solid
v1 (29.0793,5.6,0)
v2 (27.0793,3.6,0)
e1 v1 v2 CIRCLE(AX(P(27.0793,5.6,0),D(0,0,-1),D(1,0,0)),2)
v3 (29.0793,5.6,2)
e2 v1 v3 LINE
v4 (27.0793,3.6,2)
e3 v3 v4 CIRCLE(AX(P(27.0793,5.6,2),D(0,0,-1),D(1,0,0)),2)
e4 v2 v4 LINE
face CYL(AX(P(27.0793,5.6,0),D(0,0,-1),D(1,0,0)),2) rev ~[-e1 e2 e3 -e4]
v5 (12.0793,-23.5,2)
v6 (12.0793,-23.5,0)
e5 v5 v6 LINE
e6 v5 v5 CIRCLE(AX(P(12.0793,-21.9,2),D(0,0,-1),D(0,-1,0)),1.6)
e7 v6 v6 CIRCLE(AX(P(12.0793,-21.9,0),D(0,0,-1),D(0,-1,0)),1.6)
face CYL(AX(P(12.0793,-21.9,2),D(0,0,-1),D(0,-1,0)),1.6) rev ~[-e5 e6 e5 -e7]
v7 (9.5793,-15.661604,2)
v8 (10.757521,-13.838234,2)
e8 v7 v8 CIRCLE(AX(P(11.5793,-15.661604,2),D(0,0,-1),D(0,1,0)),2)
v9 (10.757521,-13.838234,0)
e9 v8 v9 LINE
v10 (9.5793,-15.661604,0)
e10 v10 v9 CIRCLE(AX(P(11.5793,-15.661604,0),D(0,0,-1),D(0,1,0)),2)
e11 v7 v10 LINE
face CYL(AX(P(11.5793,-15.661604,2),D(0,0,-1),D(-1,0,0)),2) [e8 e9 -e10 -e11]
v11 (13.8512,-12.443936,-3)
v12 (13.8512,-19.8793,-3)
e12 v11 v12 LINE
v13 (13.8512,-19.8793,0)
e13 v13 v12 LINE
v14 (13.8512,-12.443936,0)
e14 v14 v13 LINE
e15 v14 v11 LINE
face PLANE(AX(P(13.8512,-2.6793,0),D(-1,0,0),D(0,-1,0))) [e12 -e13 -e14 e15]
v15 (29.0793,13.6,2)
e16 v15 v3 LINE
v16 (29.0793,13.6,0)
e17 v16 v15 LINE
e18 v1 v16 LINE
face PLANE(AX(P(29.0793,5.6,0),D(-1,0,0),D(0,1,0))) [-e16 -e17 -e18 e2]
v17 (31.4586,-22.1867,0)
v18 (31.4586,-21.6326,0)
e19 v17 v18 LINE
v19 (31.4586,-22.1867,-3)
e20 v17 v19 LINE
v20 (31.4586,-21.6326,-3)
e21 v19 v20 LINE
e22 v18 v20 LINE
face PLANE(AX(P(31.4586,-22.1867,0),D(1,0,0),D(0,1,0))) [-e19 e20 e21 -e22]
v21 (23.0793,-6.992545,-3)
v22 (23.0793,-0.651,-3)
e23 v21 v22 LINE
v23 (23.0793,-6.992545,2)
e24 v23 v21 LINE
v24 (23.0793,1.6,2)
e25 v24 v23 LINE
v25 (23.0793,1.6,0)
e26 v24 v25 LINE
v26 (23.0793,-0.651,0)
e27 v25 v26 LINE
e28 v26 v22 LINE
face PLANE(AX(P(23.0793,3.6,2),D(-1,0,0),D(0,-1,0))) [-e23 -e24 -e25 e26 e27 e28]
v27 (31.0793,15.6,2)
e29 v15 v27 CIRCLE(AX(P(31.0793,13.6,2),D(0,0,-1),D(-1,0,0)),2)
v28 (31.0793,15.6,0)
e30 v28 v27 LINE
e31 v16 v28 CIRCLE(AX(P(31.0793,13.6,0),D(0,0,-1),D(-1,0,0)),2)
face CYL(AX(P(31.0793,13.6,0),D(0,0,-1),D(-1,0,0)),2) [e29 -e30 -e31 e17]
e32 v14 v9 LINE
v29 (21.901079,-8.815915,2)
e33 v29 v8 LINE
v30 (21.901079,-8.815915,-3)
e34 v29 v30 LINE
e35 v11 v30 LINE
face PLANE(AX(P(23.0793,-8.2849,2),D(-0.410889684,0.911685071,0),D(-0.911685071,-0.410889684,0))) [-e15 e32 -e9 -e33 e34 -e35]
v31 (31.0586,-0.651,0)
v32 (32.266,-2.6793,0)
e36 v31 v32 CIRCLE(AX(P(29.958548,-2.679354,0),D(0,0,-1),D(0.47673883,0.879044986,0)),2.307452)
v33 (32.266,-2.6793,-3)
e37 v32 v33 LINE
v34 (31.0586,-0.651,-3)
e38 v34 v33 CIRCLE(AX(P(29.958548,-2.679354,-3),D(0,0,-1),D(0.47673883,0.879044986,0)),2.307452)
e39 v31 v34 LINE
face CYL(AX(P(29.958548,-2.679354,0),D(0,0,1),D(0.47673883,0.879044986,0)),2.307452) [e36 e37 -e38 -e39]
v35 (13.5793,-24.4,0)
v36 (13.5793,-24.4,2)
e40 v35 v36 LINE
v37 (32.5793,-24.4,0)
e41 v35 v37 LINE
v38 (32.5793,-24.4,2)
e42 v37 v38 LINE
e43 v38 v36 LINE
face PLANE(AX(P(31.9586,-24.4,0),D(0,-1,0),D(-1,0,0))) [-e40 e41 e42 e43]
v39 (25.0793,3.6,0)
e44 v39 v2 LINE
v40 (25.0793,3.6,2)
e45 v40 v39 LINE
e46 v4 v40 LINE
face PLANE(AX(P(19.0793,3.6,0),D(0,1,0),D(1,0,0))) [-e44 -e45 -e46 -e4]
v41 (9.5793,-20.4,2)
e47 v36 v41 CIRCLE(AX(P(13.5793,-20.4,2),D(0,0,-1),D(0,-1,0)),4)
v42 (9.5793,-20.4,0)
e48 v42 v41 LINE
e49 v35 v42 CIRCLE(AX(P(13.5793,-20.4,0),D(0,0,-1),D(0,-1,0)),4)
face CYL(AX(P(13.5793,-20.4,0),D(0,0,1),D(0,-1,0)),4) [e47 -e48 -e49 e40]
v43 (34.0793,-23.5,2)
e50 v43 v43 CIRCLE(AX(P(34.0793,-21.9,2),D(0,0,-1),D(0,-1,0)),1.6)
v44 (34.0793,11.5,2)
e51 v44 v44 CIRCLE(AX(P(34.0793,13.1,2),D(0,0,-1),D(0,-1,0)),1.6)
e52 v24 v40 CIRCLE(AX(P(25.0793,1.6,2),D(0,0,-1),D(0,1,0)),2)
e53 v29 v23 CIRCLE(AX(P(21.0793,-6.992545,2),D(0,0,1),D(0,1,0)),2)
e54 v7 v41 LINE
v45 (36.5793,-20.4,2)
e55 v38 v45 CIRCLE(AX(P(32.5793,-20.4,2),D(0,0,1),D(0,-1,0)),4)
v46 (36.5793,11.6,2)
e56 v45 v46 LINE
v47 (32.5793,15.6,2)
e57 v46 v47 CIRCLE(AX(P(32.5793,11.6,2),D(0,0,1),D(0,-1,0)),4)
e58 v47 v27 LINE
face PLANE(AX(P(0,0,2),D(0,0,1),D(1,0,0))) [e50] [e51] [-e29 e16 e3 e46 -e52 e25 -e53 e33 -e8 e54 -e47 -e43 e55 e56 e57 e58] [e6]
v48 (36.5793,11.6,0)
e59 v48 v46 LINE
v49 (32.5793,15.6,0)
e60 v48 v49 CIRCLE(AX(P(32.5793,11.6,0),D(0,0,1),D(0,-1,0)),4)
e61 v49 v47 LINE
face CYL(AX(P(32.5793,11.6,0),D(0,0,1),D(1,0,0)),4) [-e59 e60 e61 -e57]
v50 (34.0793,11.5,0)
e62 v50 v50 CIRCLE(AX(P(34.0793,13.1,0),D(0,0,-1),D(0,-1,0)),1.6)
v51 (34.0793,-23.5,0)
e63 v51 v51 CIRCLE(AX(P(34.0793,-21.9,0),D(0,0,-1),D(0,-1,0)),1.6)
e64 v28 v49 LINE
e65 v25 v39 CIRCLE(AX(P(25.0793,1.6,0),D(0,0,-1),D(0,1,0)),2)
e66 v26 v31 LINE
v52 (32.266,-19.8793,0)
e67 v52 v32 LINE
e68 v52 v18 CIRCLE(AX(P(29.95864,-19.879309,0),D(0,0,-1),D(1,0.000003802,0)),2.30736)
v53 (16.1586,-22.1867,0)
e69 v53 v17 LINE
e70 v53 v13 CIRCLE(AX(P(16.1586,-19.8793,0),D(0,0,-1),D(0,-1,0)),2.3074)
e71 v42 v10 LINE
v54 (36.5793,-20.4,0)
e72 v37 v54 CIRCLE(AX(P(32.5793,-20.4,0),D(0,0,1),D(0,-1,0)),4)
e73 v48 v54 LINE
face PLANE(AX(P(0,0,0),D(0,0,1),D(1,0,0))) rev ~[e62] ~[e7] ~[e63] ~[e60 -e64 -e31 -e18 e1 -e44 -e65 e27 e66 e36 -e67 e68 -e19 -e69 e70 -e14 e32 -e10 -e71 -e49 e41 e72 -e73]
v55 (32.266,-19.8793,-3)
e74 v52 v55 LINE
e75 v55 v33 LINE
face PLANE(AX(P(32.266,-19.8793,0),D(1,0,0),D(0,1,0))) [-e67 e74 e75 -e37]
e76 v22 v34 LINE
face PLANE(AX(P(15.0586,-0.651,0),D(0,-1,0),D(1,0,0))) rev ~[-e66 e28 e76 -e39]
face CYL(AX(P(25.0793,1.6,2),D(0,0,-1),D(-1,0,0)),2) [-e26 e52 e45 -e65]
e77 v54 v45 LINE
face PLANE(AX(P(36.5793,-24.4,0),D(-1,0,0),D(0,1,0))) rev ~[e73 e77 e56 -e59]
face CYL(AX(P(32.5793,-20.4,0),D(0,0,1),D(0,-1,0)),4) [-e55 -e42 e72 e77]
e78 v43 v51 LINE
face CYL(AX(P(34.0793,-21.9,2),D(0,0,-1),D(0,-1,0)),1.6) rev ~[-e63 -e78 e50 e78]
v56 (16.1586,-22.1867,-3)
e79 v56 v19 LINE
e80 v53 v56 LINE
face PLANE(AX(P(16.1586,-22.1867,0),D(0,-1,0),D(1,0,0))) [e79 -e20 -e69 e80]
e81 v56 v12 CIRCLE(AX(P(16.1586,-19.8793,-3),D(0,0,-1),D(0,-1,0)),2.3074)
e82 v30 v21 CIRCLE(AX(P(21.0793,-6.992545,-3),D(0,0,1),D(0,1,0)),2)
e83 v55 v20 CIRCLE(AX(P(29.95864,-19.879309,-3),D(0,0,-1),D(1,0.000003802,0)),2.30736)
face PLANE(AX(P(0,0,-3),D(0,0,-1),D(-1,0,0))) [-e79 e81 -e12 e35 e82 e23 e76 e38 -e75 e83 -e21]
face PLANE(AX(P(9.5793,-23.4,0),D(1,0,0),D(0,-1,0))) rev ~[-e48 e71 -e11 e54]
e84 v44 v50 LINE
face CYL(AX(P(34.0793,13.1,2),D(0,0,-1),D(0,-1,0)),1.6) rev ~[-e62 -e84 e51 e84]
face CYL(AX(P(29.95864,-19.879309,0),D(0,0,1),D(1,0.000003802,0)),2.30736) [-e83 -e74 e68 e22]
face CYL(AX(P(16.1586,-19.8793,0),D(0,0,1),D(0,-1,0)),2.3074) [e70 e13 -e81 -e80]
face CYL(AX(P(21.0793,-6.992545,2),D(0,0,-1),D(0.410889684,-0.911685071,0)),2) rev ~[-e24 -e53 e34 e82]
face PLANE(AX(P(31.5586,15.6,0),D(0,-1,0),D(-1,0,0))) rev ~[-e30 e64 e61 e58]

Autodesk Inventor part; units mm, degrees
ref_plane "YZ Plane" through (0, 0, 0) normal (1, 0, 0) x (0, 1, 0)
ref_plane "XZ Plane" through (0, 0, 0) normal (0, 1, 0) x (-1, 0, 0)
ref_plane "XY Plane" through (0, 0, 0) normal (0, 0, 1) x (1, 0, 0)
ref_plane "Arbeitsebene1" through (0, 0, 0) normal (0, 0, 1) x (1, 0, 0)
sketch "Skizze1" plane through (0, 0, 0) normal (0, 0, 1) x (1, 0, 0)
  line L0 (31.9586, -24.4) -> (31.9586, -21.8494) projected
  line L1 (31.9586, -24.4) -> (35.5793, -24.4) projected
  arc A0 (35.5793, -24.4) -> (36.5793, -23.4) centre (35.5793, -23.4) ccw projected
  line L2 (36.5793, -23.4) -> (36.5793, 14.6) projected
  arc A1 (36.5793, 14.6) -> (35.5793, 15.6) centre (35.5793, 14.6) ccw projected
  line L3 (35.5793, 15.6) -> (31.5586, 15.6) projected
  line L4 (31.5586, 15.6) -> (31.5586, -0.3724) projected
  arc A2 (32.766, -2.6793) -> (31.5586, -0.3724) centre (29.9586, -2.6793) ccw projected
  line L5 (32.766, -2.6793) -> (32.766, -19.8793) projected
  arc A3 (31.9586, -21.8494) -> (32.766, -19.8793) centre (29.9586, -19.8793) ccw projected
  line L6 (20.9586, -22.6867) -> (20.9586, -24.4) projected
  line L7 (20.9586, -22.6867) -> (16.1586, -22.6867) projected
  arc A4 (13.3512, -19.8793) -> (16.1586, -22.6867) centre (16.1586, -19.8793) ccw projected
  line L8 (13.3512, -19.8793) -> (13.3512, -2.6793) projected
  arc A5 (14.5586, -0.3724) -> (13.3512, -2.6793) centre (16.1586, -2.6793) ccw projected
  line L9 (14.5586, -0.3724) -> (14.5586, 15.6) projected
  line L10 (14.5586, 15.6) -> (10.5793, 15.6) projected
  arc A6 (10.5793, 15.6) -> (9.5793, 14.6) centre (10.5793, 14.6) ccw projected
  line L11 (9.5793, 14.6) -> (9.5793, -23.4) projected
  arc A7 (9.5793, -23.4) -> (10.5793, -24.4) centre (10.5793, -23.4) ccw projected
  line L12 (10.5793, -24.4) -> (20.9586, -24.4) projected
  circle A8 centre (12.0668, 4.4966) radius 1.4 projected
  line L13 (31.5586, 15.6) -> (14.5586, 15.6)
  line L14 (31.9586, -24.4) -> (20.9586, -24.4)
  line L15 (10.5793, 15.6) -> (9.5793, 15.6)
  line L16 (9.5793, 15.6) -> (9.5793, 14.6)
  line L17 (35.5793, 15.6) -> (36.5793, 15.6)
  line L18 (36.5793, 15.6) -> (36.5793, 14.6)
  line L19 (9.5793, -23.4) -> (9.5793, -24.4)
  line L20 (9.5793, -24.4) -> (10.5793, -24.4)
  line L21 (35.5793, -24.4) -> (36.5793, -24.4)
  line L22 (36.5793, -24.4) -> (36.5793, -23.4)
extrude "Extrusion1" add sketch "Skizze1" along normal blind 2 contours L14 L6 L7 A4 L8 A5 L9 L13 L4 A2 L5 A3 L0 | L0 A3 L5 A2 L4 L3 A1 L2 A0 L1 | A0 L22 L21 | L12 A7 L11 A6 L10 L9 A5 L8 A4 L7 L6 | L20 L19 A7 | A1 L17 L18 | L16 L15 A6 | A8
ref_plane "Arbeitsebene2" through (0, 0, 0) normal (0, 0, 1) x (1, 0, 0)
sketch "Skizze2" plane through (0, 0, 2) normal (0, 0, 1) x (1, 0, 0)
  arc A0 (35.5793, -24.4) -> (36.5793, -23.4) centre (35.5793, -23.4) ccw projected
  line L0 (36.5793, -23.4) -> (36.5793, 14.6) projected
  arc A1 (36.5793, 14.6) -> (35.5793, 15.6) centre (35.5793, 14.6) ccw projected
  line L1 (35.5793, 15.6) -> (10.5793, 15.6) projected
  arc A2 (10.5793, 15.6) -> (9.5793, 14.6) centre (10.5793, 14.6) ccw projected
  line L2 (9.5793, 14.6) -> (9.5793, -23.4) projected
  arc A3 (9.5793, -23.4) -> (10.5793, -24.4) centre (10.5793, -23.4) ccw projected
  line L3 (10.5793, -24.4) -> (35.5793, -24.4) projected
  line L4 (34.0793, 13.1) -> (34.0793, -21.9)
  line L5 (34.0793, -21.9) -> (12.0793, -21.9)
  line L6 (12.0793, -21.9) -> (12.0793, 13.1)
  line L7 (12.0793, 13.1) -> (34.0793, 13.1)
  point P0 (8.0712, 15)
  point P1 (8.0712, -15)
  point P2 (38.0712, 15)
  point P3 (38.0712, -15)
  dimension "d21" = 2.5
hole "Bohrung1" at (34.0793, 13.1, 2) at (34.0793, -21.9, 2) at (12.0793, -21.9, 2) at (12.0793, 13.1, 2) direction (0, 0, -1) diameter 3.2 end through all
sketch "Skizze4" plane through (0, 0, 0) normal (0, 0, -1) x (-1, 0, 0)
  circle A0 centre (-34.0793, 13.1) radius 1.4 projected
  circle A1 centre (-34.0793, -21.9) radius 1.4 projected
  line L0 (-31.9586, -24.4) -> (-31.9586, -21.8494) projected
  line L1 (-31.9586, -24.4) -> (-35.5793, -24.4) projected
  arc A2 (-36.5793, -23.4) -> (-35.5793, -24.4) centre (-35.5793, -23.4) ccw projected
  line L2 (-36.5793, -23.4) -> (-36.5793, 14.6) projected
  arc A3 (-35.5793, 15.6) -> (-36.5793, 14.6) centre (-35.5793, 14.6) ccw projected
  line L3 (-35.5793, 15.6) -> (-31.5586, 15.6) projected
  line L4 (-31.5586, 15.6) -> (-31.5586, -0.3724) projected
  arc A4 (-31.5586, -0.3724) -> (-32.766, -2.6793) centre (-29.9586, -2.6793) ccw projected
  line L5 (-32.766, -2.6793) -> (-32.766, -19.8793) projected
  arc A5 (-32.766, -19.8793) -> (-31.9586, -21.8494) centre (-29.9586, -19.8793) ccw projected
  circle A6 centre (-12.0793, -21.9) radius 1.4 projected
  circle A7 centre (-12.0793, 13.1) radius 1.4 projected
  line L6 (-20.9586, -22.6867) -> (-20.9586, -24.4) projected
  line L7 (-20.9586, -22.6867) -> (-16.1586, -22.6867) projected
  arc A8 (-16.1586, -22.6867) -> (-13.3512, -19.8793) centre (-16.1586, -19.8793) ccw projected
  line L8 (-13.3512, -19.8793) -> (-13.3512, -2.6793) projected
  arc A9 (-13.3512, -2.6793) -> (-14.5586, -0.3724) centre (-16.1586, -2.6793) ccw projected
  line L9 (-14.5586, -0.3724) -> (-14.5586, 15.6) projected
  line L10 (-14.5586, 15.6) -> (-10.5793, 15.6) projected
  arc A10 (-9.5793, 14.6) -> (-10.5793, 15.6) centre (-10.5793, 14.6) ccw projected
  line L11 (-9.5793, 14.6) -> (-9.5793, -23.4) projected
  arc A11 (-10.5793, -24.4) -> (-9.5793, -23.4) centre (-10.5793, -23.4) ccw projected
  line L12 (-10.5793, -24.4) -> (-20.9586, -24.4) projected
  circle A12 centre (-12.0668, 4.4966) radius 1.4 projected
  line L13 (-31.0586, -0.651) -> (-31.0586, 16.1)
  line L14 (-31.0586, 16.1) -> (-35.5793, 16.1)
  arc A13 (-35.5793, 16.1) -> (-37.0793, 14.6) centre (-35.5793, 14.6) ccw
  line L15 (-37.0793, 14.6) -> (-37.0793, -23.4)
  arc A14 (-37.0793, -23.4) -> (-35.5793, -24.9) centre (-35.5793, -23.4) ccw
  line L16 (-35.5793, -24.9) -> (-31.4586, -24.9)
  line L17 (-31.4586, -24.9) -> (-31.4586, -21.6326)
  arc A15 (-32.266, -19.8793) -> (-31.4586, -21.6326) centre (-29.9586, -19.8793) ccw
  line L18 (-32.266, -19.8793) -> (-32.266, -2.6793)
  arc A16 (-31.0586, -0.651) -> (-32.266, -2.6793) centre (-29.9586, -2.6793) ccw
  line L19 (-15.0586, 16.1) -> (-15.0586, -0.651)
  arc A17 (-13.8512, -2.6793) -> (-15.0586, -0.651) centre (-16.1586, -2.6793) ccw
  line L20 (-13.8512, -2.6793) -> (-13.8512, -19.8793)
  arc A18 (-16.1586, -22.1867) -> (-13.8512, -19.8793) centre (-16.1586, -19.8793) ccw
  line L21 (-16.1586, -22.1867) -> (-21.4586, -22.1867)
  line L22 (-21.4586, -24.4607) -> (-21.4586, -24.9)
  line L23 (-21.4586, -24.9) -> (-10.5793, -24.9)
  arc A19 (-10.5793, -24.9) -> (-9.0793, -23.4) centre (-10.5793, -23.4) ccw
  line L24 (-9.0793, -23.4) -> (-9.0793, 14.6)
  arc A20 (-9.0793, 14.6) -> (-10.5793, 16.1) centre (-10.5793, 14.6) ccw
  line L25 (-10.5793, 16.1) -> (-15.0586, 16.1)
  line L26 (-31.0586, 15.6607) -> (-15.0586, 15.6607)
  line L27 (-31.4586, -24.4607) -> (-21.4586, -24.4607)
  line L28 (-15.0586, -0.651) -> (-31.0586, -0.651)
  line L29 (-20.9586, -22.6867) -> (-20.9586, -22.1867)
  line L30 (-20.9586, -22.1867) -> (-31.9586, -22.1867)
  point P0 (0, 0)
  point P1 (-31.4586, -22.1867)
  dimension "d22" = 0.5
  dimension "d23" = 0.5
extrude "Extrusion2" add sketch "Skizze4" along normal blind 3 contours L28 A17 L20 A18 L21 L30 L17 A15 L18 A16
fillet "Rundung2" radius 4 4 edges at (9.5793, 15.6, 1) (36.5793, 15.6, 1) (9.5793, -24.4, 1) (36.5793, -24.4, 1)
sketch "Skizze5" plane through (0, 0, 0) normal (0, 0, -1) x (-1, 0, 0)
  circle A0 centre (-23.0793, -4.4) radius 4.25 projected
  circle A1 centre (-12.0668, 4.4966) radius 1.4 projected
  circle A2 centre (-34.0668, 4.4966) radius 1.4 projected
  circle A3 centre (-12.0793, 13.1) radius 1.4 projected
  circle A4 centre (-34.0793, -21.9) radius 1.4 projected
  circle A5 centre (-34.0793, 13.1) radius 1.4 projected
  circle A6 centre (-12.0793, -21.9) radius 1.4 projected
  arc A7 (-29.0793, 13.6) -> (-31.0793, 15.6) centre (-31.0793, 13.6) ccw projected
  line L0 (-32.5793, 15.6) -> (-31.0793, 15.6) projected
  arc A8 (-32.5793, 15.6) -> (-36.5793, 11.6) centre (-32.5793, 11.6) ccw projected
  line L1 (-36.5793, -20.4) -> (-36.5793, 11.6) projected
  arc A9 (-36.5793, -20.4) -> (-32.5793, -24.4) centre (-32.5793, -20.4) ccw projected
  line L2 (-13.5793, -24.4) -> (-32.5793, -24.4) projected
  arc A10 (-13.5793, -24.4) -> (-9.5793, -20.4) centre (-13.5793, -20.4) ccw projected
  line L3 (-9.5793, 11.6) -> (-9.5793, -20.4) projected
  arc A11 (-9.5793, 11.6) -> (-13.5793, 15.6) centre (-13.5793, 11.6) ccw projected
  line L4 (-15.0793, 15.6) -> (-13.5793, 15.6) projected
  arc A12 (-15.0793, 15.6) -> (-17.0793, 13.6) centre (-15.0793, 13.6) ccw projected
  line L5 (-17.0793, 13.6) -> (-17.0793, 5.6) projected
  arc A13 (-19.0793, 3.6) -> (-17.0793, 5.6) centre (-19.0793, 5.6) ccw projected
  line L6 (-19.0793, 3.6) -> (-27.0793, 3.6) projected
  arc A14 (-29.0793, 5.6) -> (-27.0793, 3.6) centre (-27.0793, 5.6) ccw projected
  line L7 (-29.0793, 5.6) -> (-29.0793, 13.6) projected
  line L8 (-32.5793, 15.6) -> (-13.5793, 15.6) projected
  point P0 (0, 0)
extrude "Extrusion3" cut sketch "Skizze5" against normal blind 10 contours A7 L8 A12 L5 A13 L6 A14 L7
sketch "Skizze6" plane through (0, 0, 2) normal (0, 0, 1) x (1, 0, 0)
  line L0 (19.0793, 3.6) -> (27.0793, 3.6) projected
  line L1 (23.0793, 3.6) -> (23.0793, -8.2849)
  line L2 (23.0793, -8.2849) -> (9.5499, -14.3825)
  circle A0 centre (12.0793, 13.1) radius 1.6 projected
  circle A1 centre (34.0793, -21.9) radius 1.6 projected
  circle A2 centre (34.0793, 13.1) radius 1.6 projected
  circle A3 centre (12.0793, -21.9) radius 1.6 projected
  arc A4 (31.0793, 15.6) -> (29.0793, 13.6) centre (31.0793, 13.6) ccw projected
  line L3 (29.0793, 13.6) -> (29.0793, 5.6) projected
  arc A5 (27.0793, 3.6) -> (29.0793, 5.6) centre (27.0793, 5.6) ccw projected
  line L4 (27.0793, 3.6) -> (19.0793, 3.6) projected
  arc A6 (17.0793, 5.6) -> (19.0793, 3.6) centre (19.0793, 5.6) ccw projected
  line L5 (17.0793, 5.6) -> (17.0793, 13.6) projected
  arc A7 (17.0793, 13.6) -> (15.0793, 15.6) centre (15.0793, 13.6) ccw projected
  line L6 (15.0793, 15.6) -> (13.5793, 15.6) projected
  arc A8 (13.5793, 15.6) -> (9.5793, 11.6) centre (13.5793, 11.6) ccw projected
  line L7 (9.5793, 11.6) -> (9.5793, -20.4) projected
  arc A9 (9.5793, -20.4) -> (13.5793, -24.4) centre (13.5793, -20.4) ccw projected
  line L8 (13.5793, -24.4) -> (32.5793, -24.4) projected
  arc A10 (32.5793, -24.4) -> (36.5793, -20.4) centre (32.5793, -20.4) ccw projected
  line L9 (36.5793, -20.4) -> (36.5793, 11.6) projected
  arc A11 (36.5793, 11.6) -> (32.5793, 15.6) centre (32.5793, 11.6) ccw projected
  line L10 (32.5793, 15.6) -> (31.0793, 15.6) projected
  point P0 (0, 0)
  point P1 (9.5793, -14.3692)
extrude "Extrusion4" cut sketch "Skizze6" against normal blind 10 contours L0 L1 L2 L7 A8 L6 A7 L5 A6
fillet "Rundung3" radius 2 3 edges at (23.0793, 3.6, 1) (23.0793, -8.2849, -0.5) (9.5793, -14.3692, 1)
properties part number "00_ESP32_XIAO_Adapter_lid_a4988"
